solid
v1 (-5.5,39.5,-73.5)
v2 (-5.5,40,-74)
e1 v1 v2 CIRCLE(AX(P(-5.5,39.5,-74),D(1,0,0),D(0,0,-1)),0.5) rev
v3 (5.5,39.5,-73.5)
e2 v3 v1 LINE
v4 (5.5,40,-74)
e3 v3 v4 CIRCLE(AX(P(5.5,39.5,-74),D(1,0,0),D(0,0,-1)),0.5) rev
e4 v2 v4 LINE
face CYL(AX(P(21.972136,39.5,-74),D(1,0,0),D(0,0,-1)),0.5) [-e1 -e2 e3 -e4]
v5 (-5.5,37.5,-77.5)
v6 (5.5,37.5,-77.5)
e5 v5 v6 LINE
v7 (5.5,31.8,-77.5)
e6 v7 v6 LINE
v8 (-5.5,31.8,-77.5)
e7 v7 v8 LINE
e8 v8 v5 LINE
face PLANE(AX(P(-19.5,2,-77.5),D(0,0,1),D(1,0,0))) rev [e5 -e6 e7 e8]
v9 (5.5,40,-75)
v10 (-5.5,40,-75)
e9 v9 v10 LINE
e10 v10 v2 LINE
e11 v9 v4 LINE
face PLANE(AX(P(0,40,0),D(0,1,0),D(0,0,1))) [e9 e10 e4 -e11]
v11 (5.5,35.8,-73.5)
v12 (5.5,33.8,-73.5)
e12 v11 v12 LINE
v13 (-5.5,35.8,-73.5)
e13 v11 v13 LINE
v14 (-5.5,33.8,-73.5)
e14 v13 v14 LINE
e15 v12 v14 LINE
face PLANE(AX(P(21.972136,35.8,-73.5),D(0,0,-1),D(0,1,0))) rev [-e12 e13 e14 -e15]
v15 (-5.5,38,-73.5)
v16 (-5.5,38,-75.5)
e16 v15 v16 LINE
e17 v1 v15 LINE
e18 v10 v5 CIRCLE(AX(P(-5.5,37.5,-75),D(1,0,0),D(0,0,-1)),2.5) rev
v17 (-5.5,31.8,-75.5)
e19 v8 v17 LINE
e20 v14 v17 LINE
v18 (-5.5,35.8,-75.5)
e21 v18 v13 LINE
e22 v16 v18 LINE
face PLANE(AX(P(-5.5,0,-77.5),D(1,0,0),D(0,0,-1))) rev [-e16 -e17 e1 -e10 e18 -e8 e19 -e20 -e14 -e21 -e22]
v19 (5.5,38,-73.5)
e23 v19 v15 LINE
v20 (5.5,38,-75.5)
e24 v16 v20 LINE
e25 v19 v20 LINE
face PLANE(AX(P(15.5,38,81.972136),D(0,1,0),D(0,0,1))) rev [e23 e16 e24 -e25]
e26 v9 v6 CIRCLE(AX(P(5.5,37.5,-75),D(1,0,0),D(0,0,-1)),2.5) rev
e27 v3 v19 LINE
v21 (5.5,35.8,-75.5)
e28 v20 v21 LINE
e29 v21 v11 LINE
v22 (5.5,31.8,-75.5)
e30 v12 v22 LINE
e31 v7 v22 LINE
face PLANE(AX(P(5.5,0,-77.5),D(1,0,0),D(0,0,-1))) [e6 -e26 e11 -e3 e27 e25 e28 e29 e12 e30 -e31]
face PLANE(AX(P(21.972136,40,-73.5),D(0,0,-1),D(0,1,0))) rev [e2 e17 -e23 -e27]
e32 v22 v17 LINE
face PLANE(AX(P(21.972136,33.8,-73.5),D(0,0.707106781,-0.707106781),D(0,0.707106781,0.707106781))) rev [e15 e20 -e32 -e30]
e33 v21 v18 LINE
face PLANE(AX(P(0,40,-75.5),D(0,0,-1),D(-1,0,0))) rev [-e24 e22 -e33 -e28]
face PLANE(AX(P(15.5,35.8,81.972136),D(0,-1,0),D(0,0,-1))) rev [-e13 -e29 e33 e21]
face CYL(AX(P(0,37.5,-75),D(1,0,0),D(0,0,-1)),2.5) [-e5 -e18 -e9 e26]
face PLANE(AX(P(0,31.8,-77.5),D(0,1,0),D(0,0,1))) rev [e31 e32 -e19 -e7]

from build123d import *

# Parameters (mm, degrees)
SKETCH1_W                       = 39
SKETCH1_H                       = 155
BOSS_EXTRUDE1_DEPTH             = 2
BOSS_EXTRUDE2_DEPTH             = 38
SKETCH3_W                       = 2
SKETCH3_H                       = 2
BOSS_EXTRUDE3_DEPTH             = 38
SKETCH4_W                       = 2
SKETCH4_H                       = 2
BOSS_EXTRUDE4_DEPTH             = 151
SKETCH6_W                       = 35
SKETCH6_H                       = 2.2
CUT_EXTRUDE1_DEPTH              = 160.340045186
SKETCH7_W                       = 35
SKETCH7_H                       = 2.2
CUT_EXTRUDE2_DEPTH              = 89.490112442
SKETCH5_W                       = 31
SKETCH5_H                       = 2
BOSS_EXTRUDE5_DEPTH             = 2
BOSS_EXTRUDE6_REACH             = 91.367
SKETCH8_W                       = 2
SKETCH8_H                       = 2
BOSS_EXTRUDE6_DIRECTION_2_REACH = 91.367
SKETCH10_W                      = 2
SKETCH10_H                      = 2.2
SKETCH10_W_2                    = 2.2
SKETCH10_H_2                    = 2
BOSS_EXTRUDE8_DEPTH             = 2
SKETCH11_W                      = 2
SKETCH11_H                      = 2.2
SKETCH11_W_2                    = 2.2
SKETCH11_H_2                    = 2
BOSS_EXTRUDE9_DEPTH             = 2
FILLET2_R                       = 2.5
SKETCH14_W                      = 36.5
SKETCH14_H                      = 7.75
BOSS_EXTRUDE10_DEPTH            = 2
SKETCH13_W                      = 31
SKETCH13_H                      = 3
CUT_EXTRUDE4_DEPTH              = 2
FILLET3_R                       = 2
FILLET4_R                       = 0.5
SKETCH15_R                      = 5.1
CUT_EXTRUDE5_DEPTH              = 90.367219941
SKETCH16_R                      = 7.1
BOSS_EXTRUDE11_DEPTH            = 1
FILLET5_R                       = 0.5
FILLET7_R                       = 0.5
CUT_EXTRUDE6_DEPTH              = 6
SKETCH18_W                      = 29
SKETCH18_H                      = 3
CUT_EXTRUDE8_DEPTH              = 90.367219986
CUT_EXTRUDE11_DEPTH             = 90.367219986
CUT_EXTRUDE11_DEPTH_BACK        = 90.367219986
SKETCH20_W                      = 5
SKETCH20_H                      = 40
SKETCH21_W                      = 9
SKETCH21_H                      = 31
CUT_EXTRUDE12_DEPTH             = 89.41097217
SKETCH22_W                      = 11
SKETCH22_H                      = 22.8
CUT_EXTRUDE13_DEPTH             = 41.425858061


with BuildPart() as part:
    # Sketch1 → Boss-Extrude1 (new body)
    with BuildSketch(Plane(origin=(0, 0, 0), x_dir=(1, 0, 0), z_dir=(0, 1, 0))):
        Rectangle(SKETCH1_W, SKETCH1_H)
    extrude(amount=BOSS_EXTRUDE1_DEPTH)

    # Sketch2 → Boss-Extrude2 (add)
    with BuildSketch(Plane(origin=(0, 2, 0), x_dir=(1, 0, 0), z_dir=(0, 1, 0))):
        Polygon((-17.5, -77.5), (-17.5, -75.5), (-17.5, 75.5), (17.5, 75.5), (17.5, -75.5), (17.5, -77.5), (19.5, -77.5), (19.5, 77.5), (-19.5, 77.5), (-19.5, -77.5), align=None)
    extrude(amount=BOSS_EXTRUDE2_DEPTH)

    # Sketch3 → Boss-Extrude3 (add)
    with BuildSketch(Plane(origin=(0, 2, 0), x_dir=(1, 0, 0), z_dir=(0, 1, 0))):
        with Locations((-16.5, -76.5)):
            Rectangle(SKETCH3_W, SKETCH3_H)
        with Locations((-16.5, -72.3)):
            Rectangle(SKETCH3_W, SKETCH3_H)
        with Locations((16.5, -76.5)):
            Rectangle(SKETCH3_W, SKETCH3_H)
        with Locations((16.5, -72.3)):
            Rectangle(SKETCH3_W, SKETCH3_H)
    extrude(amount=BOSS_EXTRUDE3_DEPTH)

    # Sketch4 → Boss-Extrude4 (add)
    with BuildSketch(Plane.XY.offset(-75.5)):
        with Locations((-16.5, 39)):
            Rectangle(SKETCH4_W, SKETCH4_H)
        Polygon((-15.5, 33.8), (-17.5, 31.8), (-17.5, 35.8), (-15.5, 35.8), align=None)
        Polygon((15.5, 35.8), (17.5, 35.8), (17.5, 31.8), (15.5, 33.8), align=None)
        with Locations((16.5, 39)):
            Rectangle(SKETCH4_W, SKETCH4_H)
    extrude(amount=BOSS_EXTRUDE4_DEPTH)

    # Sketch6 → Cut-Extrude1 (cut, through all)
    with BuildSketch(Plane.XY.offset(-75.5)):
        with Locations((0, 36.9)):
            Rectangle(SKETCH6_W, SKETCH6_H)
    extrude(amount=CUT_EXTRUDE1_DEPTH, mode=Mode.SUBTRACT)

    # Sketch7 → Cut-Extrude2 (cut, through all)
    with BuildSketch(Plane(origin=(0, 2, 0), x_dir=(1, 0, 0), z_dir=(0, 1, 0))):
        with Locations((0, -74.4)):
            Rectangle(SKETCH7_W, SKETCH7_H)
    extrude(amount=CUT_EXTRUDE2_DEPTH, mode=Mode.SUBTRACT)

    # Sketch5 → Boss-Extrude5 (add)
    with BuildSketch(Plane(origin=(0, 2, 0), x_dir=(1, 0, 0), z_dir=(0, 1, 0))):
        with Locations((0, -76.5)):
            Rectangle(SKETCH5_W, SKETCH5_H)
        with Locations((0, -72.3)):
            Rectangle(SKETCH5_W, SKETCH5_H)
    extrude(amount=BOSS_EXTRUDE5_DEPTH)

    # Boss-Extrude6: up to this face of the body (flat: up to its plane)
    boss_extrude6_end = Plane(part.part.faces().sort_by_distance((17.5, 16.9, -2.1))[0])
    # Sketch8 → Boss-Extrude6 (add, up to the picked face)
    with BuildSketch(Plane(origin=(0, 0, 0), x_dir=(0, 0, -1), z_dir=(1, 0, 0)), mode=Mode.PRIVATE) as boss_extrude6_sk1:
        with Locations((74.5, 39)):
            Rectangle(SKETCH8_W, SKETCH8_H)
    boss_extrude6_tool1 = split(extrude(boss_extrude6_sk1.sketch, amount=BOSS_EXTRUDE6_REACH, mode=Mode.PRIVATE), bisect_by=boss_extrude6_end, keep=Keep.BOTH, mode=Mode.PRIVATE)
    # Sketch8 → Boss-Extrude6 (add, up to the picked face)
    with BuildSketch(Plane(origin=(0, 0, 0), x_dir=(0, 0, -1), z_dir=(1, 0, 0)), mode=Mode.PRIVATE) as boss_extrude6_sk2:
        Polygon((75.5, 35.8), (73.5, 35.8), (73.5, 33.8), (75.5, 31.8), align=None)
    boss_extrude6_tool2 = split(extrude(boss_extrude6_sk2.sketch, amount=BOSS_EXTRUDE6_REACH, mode=Mode.PRIVATE), bisect_by=boss_extrude6_end, keep=Keep.BOTH, mode=Mode.PRIVATE)
    add(boss_extrude6_tool1.solids().sort_by(Axis((0, 39, -74.5), (1, 0, 0)))[0])
    add(boss_extrude6_tool2.solids().sort_by(Axis((0, 34.244444, -74.611111), (1, 0, 0)))[0])

    # Boss-Extrude6 direction 2: up to this face of the body (flat: up to its plane)
    boss_extrude6_direction_2_end = Plane(part.part.faces().sort_by_distance((-17.5, 16.9, -2.1))[0])
    # Sketch8 → Boss-Extrude6 direction 2 (add, up to the picked face)
    with BuildSketch(Plane(origin=(0, 0, 0), x_dir=(0, 0, -1), z_dir=(1, 0, 0)), mode=Mode.PRIVATE) as boss_extrude6_direction_2_sk1:
        with Locations((74.5, 39)):
            Rectangle(SKETCH8_W, SKETCH8_H)
    boss_extrude6_direction_2_tool1 = split(extrude(boss_extrude6_direction_2_sk1.sketch, amount=-BOSS_EXTRUDE6_DIRECTION_2_REACH, mode=Mode.PRIVATE), bisect_by=boss_extrude6_direction_2_end, keep=Keep.BOTH, mode=Mode.PRIVATE)
    # Sketch8 → Boss-Extrude6 direction 2 (add, up to the picked face)
    with BuildSketch(Plane(origin=(0, 0, 0), x_dir=(0, 0, -1), z_dir=(1, 0, 0)), mode=Mode.PRIVATE) as boss_extrude6_direction_2_sk2:
        Polygon((75.5, 35.8), (73.5, 35.8), (73.5, 33.8), (75.5, 31.8), align=None)
    boss_extrude6_direction_2_tool2 = split(extrude(boss_extrude6_direction_2_sk2.sketch, amount=-BOSS_EXTRUDE6_DIRECTION_2_REACH, mode=Mode.PRIVATE), bisect_by=boss_extrude6_direction_2_end, keep=Keep.BOTH, mode=Mode.PRIVATE)
    add(boss_extrude6_direction_2_tool1.solids().sort_by(Axis((0, 39, -74.5), (-1, 0, 0)))[0])
    add(boss_extrude6_direction_2_tool2.solids().sort_by(Axis((0, 34.244444, -74.611111), (-1, 0, 0)))[0])

    # Sketch10 → Boss-Extrude8 (add)
    with BuildSketch(Plane(origin=(-17.5, 0, 0), x_dir=(0, 0, -1), z_dir=(1, 0, 0))):
        with Locations((-76.5, 36.9)):
            Rectangle(SKETCH10_W, SKETCH10_H)
        with Locations((-74.4, 39)):
            Rectangle(SKETCH10_W_2, SKETCH10_H_2)
    extrude(amount=BOSS_EXTRUDE8_DEPTH)

    # Sketch11 → Boss-Extrude9 (add)
    with BuildSketch(Plane.ZY.offset(-17.5)):
        with Locations((76.5, 36.9)):
            Rectangle(SKETCH11_W, SKETCH11_H)
        with Locations((74.4, 39)):
            Rectangle(SKETCH11_W_2, SKETCH11_H_2)
    extrude(amount=BOSS_EXTRUDE9_DEPTH)

    # Fillet2
    fillet2_edges = [part.edges().sort_by_distance(p)[0] for p in [
        (-17.5, 16.9, 71.3),
        (17.5, 16.9, 71.3),
        (19.5, 20, 77.5),
        (-19.5, 20, 77.5),
        (-19.5, 20, -77.5),
        (-17.5, 16.9, -75.5),
        (17.5, 16.9, -75.5),
        (19.5, 20, -77.5),
        (19.5, 40, 0),
        (-19.5, 40, 0),
        (19.5, 0, 0),
        (-19.5, 0, 0),
        (0, 40, -77.5),
        (0, 0, 77.5),
        (0, 0, -77.5),
        (-17.5, 40, 77.5),
        (17.5, 40, 77.5),
    ]]
    fillet(fillet2_edges, radius=FILLET2_R)

    # Sketch14 → Boss-Extrude10 (add)
    with BuildSketch(Plane.XY.offset(-75.5)):
        with Locations((0, 5.125)):
            Rectangle(SKETCH14_W, SKETCH14_H)
    extrude(amount=BOSS_EXTRUDE10_DEPTH)

    # Sketch13 → Cut-Extrude4 (cut)
    with BuildSketch(Plane(origin=(0, 0, -77.5), x_dir=(-1, 0, 0), z_dir=(0, 0, -1))):
        with Locations((0, 5.5)):
            Rectangle(SKETCH13_W, SKETCH13_H)
    extrude(amount=-CUT_EXTRUDE4_DEPTH, mode=Mode.SUBTRACT)

    # Fillet3
    fillet3_edges = [part.edges().sort_by_distance(p)[0] for p in [
        (0, 9, -73.5),
    ]]
    fillet(fillet3_edges, radius=FILLET3_R - 0.0001)  # a hair under: the kernel refuses the full size

    # Fillet4
    fillet4_edges = [part.edges().sort_by_distance(p)[0] for p in [
        (15.5, 5.5, -75.5),
        (15.5, 4, -76.5),
        (0, 7, -75.5),
        (15.5, 7, -76.5),
        (-15.5, 5.5, -75.5),
        (-15.5, 7, -76.5),
        (0, 4, -75.5),
        (-15.5, 4, -76.5),
        (15.5, 5.5, -77.5),
        (0, 4, -77.5),
        (-15.5, 5.5, -77.5),
        (0, 7, -77.5),
    ]]
    fillet(fillet4_edges, radius=FILLET4_R)

    # Sketch15 → Cut-Extrude5 (cut, through all)
    with BuildSketch(Plane.XZ):
        with Locations(Location((0, 38.75, 0), (0, 0, 270))):
            Circle(SKETCH15_R)
        with Locations(Location((0, -38.75, 0), (0, 0, 270))):
            Circle(SKETCH15_R)
    extrude(amount=-CUT_EXTRUDE5_DEPTH, mode=Mode.SUBTRACT)

    # Sketch16 → Boss-Extrude11 (add)
    with BuildSketch(Plane(origin=(0, 2, 0), x_dir=(1, 0, 0), z_dir=(0, 1, 0))):
        with Locations(Location((0, 38.75, 0), (0, 0, 270))):
            Circle(SKETCH16_R)
        with Locations(Location((0, -38.75, 0), (0, 0, 270))):
            Circle(SKETCH16_R)
    extrude(amount=BOSS_EXTRUDE11_DEPTH)

    # Fillet5
    fillet5_edges = [part.edges().sort_by_distance(p)[0] for p in [
        (0, 2, -45.85),
        (0, 3, -45.85),
        (0, 2, 31.65),
        (0, 3, 31.65),
    ]]
    fillet(fillet5_edges, radius=FILLET5_R - 0.0001)  # a hair under: the kernel refuses the full size

    # Fillet7
    fillet7_edges = [part.edges().sort_by_distance(p)[0] for p in [
        (15.5, 40, 0.75),
        (0, 4, 77.5),
        (0, 40, -73.5),
        (-15.5, 40, 0.75),
        (-15.5, 20.75, 77.5),
        (-15.5, 39.267766953, 76.767766953),
        (15.5, 20.75, 77.5),
        (15.5, 39.267766953, 76.767766953),
    ]]
    fillet(fillet7_edges, radius=FILLET7_R)

    # Sketch17 → Cut-Extrude6 (cut)
    with BuildSketch(Plane.XZ):
        Polygon((-17, -77.5), (-17, 70.299999999), (-14.999999999, 71.3), (-14.999999999, 77.5), (14.999999999, 77.5), (14.999999999, 71.3), (17, 70.299999999), (17, -77.5), align=None)
    extrude(amount=-CUT_EXTRUDE6_DEPTH, mode=Mode.SUBTRACT)

    # Sketch18 → Cut-Extrude8 (cut, through all)
    with BuildSketch(Plane.XY):
        with Locations((0, 7.5)):
            Rectangle(SKETCH18_W, SKETCH18_H)
    extrude(amount=-CUT_EXTRUDE8_DEPTH, mode=Mode.SUBTRACT)

    # Sketch20 → Cut-Extrude11 (cut, two sides: drawn at the far end of the back side and taken through both)
    with BuildSketch(Plane.XY.offset(-CUT_EXTRUDE11_DEPTH_BACK)):
        Polygon((19.5, 40), (14.5, 40), (14.5, 6), (14.5, 0), (19.5, 0), align=None)
        with Locations((-17, 20)):
            Rectangle(SKETCH20_W, SKETCH20_H)
    extrude(amount=CUT_EXTRUDE11_DEPTH + CUT_EXTRUDE11_DEPTH_BACK, mode=Mode.SUBTRACT)

    # Sketch21 → Cut-Extrude12 (cut, through all)
    with BuildSketch(Plane.XY):
        with Locations((-10, 24.5)):
            Rectangle(SKETCH21_W, SKETCH21_H)
        with Locations((10, 24.5)):
            Rectangle(SKETCH21_W, SKETCH21_H)
    extrude(amount=-CUT_EXTRUDE12_DEPTH, mode=Mode.SUBTRACT)

    # Sketch22 → Cut-Extrude13 (cut, through all)
    with BuildSketch(Plane.XY.offset(-75.5)):
        with Locations((0, 20.4)):
            Rectangle(SKETCH22_W, SKETCH22_H)
    extrude(amount=-CUT_EXTRUDE13_DEPTH, mode=Mode.SUBTRACT)


solid = part.part
